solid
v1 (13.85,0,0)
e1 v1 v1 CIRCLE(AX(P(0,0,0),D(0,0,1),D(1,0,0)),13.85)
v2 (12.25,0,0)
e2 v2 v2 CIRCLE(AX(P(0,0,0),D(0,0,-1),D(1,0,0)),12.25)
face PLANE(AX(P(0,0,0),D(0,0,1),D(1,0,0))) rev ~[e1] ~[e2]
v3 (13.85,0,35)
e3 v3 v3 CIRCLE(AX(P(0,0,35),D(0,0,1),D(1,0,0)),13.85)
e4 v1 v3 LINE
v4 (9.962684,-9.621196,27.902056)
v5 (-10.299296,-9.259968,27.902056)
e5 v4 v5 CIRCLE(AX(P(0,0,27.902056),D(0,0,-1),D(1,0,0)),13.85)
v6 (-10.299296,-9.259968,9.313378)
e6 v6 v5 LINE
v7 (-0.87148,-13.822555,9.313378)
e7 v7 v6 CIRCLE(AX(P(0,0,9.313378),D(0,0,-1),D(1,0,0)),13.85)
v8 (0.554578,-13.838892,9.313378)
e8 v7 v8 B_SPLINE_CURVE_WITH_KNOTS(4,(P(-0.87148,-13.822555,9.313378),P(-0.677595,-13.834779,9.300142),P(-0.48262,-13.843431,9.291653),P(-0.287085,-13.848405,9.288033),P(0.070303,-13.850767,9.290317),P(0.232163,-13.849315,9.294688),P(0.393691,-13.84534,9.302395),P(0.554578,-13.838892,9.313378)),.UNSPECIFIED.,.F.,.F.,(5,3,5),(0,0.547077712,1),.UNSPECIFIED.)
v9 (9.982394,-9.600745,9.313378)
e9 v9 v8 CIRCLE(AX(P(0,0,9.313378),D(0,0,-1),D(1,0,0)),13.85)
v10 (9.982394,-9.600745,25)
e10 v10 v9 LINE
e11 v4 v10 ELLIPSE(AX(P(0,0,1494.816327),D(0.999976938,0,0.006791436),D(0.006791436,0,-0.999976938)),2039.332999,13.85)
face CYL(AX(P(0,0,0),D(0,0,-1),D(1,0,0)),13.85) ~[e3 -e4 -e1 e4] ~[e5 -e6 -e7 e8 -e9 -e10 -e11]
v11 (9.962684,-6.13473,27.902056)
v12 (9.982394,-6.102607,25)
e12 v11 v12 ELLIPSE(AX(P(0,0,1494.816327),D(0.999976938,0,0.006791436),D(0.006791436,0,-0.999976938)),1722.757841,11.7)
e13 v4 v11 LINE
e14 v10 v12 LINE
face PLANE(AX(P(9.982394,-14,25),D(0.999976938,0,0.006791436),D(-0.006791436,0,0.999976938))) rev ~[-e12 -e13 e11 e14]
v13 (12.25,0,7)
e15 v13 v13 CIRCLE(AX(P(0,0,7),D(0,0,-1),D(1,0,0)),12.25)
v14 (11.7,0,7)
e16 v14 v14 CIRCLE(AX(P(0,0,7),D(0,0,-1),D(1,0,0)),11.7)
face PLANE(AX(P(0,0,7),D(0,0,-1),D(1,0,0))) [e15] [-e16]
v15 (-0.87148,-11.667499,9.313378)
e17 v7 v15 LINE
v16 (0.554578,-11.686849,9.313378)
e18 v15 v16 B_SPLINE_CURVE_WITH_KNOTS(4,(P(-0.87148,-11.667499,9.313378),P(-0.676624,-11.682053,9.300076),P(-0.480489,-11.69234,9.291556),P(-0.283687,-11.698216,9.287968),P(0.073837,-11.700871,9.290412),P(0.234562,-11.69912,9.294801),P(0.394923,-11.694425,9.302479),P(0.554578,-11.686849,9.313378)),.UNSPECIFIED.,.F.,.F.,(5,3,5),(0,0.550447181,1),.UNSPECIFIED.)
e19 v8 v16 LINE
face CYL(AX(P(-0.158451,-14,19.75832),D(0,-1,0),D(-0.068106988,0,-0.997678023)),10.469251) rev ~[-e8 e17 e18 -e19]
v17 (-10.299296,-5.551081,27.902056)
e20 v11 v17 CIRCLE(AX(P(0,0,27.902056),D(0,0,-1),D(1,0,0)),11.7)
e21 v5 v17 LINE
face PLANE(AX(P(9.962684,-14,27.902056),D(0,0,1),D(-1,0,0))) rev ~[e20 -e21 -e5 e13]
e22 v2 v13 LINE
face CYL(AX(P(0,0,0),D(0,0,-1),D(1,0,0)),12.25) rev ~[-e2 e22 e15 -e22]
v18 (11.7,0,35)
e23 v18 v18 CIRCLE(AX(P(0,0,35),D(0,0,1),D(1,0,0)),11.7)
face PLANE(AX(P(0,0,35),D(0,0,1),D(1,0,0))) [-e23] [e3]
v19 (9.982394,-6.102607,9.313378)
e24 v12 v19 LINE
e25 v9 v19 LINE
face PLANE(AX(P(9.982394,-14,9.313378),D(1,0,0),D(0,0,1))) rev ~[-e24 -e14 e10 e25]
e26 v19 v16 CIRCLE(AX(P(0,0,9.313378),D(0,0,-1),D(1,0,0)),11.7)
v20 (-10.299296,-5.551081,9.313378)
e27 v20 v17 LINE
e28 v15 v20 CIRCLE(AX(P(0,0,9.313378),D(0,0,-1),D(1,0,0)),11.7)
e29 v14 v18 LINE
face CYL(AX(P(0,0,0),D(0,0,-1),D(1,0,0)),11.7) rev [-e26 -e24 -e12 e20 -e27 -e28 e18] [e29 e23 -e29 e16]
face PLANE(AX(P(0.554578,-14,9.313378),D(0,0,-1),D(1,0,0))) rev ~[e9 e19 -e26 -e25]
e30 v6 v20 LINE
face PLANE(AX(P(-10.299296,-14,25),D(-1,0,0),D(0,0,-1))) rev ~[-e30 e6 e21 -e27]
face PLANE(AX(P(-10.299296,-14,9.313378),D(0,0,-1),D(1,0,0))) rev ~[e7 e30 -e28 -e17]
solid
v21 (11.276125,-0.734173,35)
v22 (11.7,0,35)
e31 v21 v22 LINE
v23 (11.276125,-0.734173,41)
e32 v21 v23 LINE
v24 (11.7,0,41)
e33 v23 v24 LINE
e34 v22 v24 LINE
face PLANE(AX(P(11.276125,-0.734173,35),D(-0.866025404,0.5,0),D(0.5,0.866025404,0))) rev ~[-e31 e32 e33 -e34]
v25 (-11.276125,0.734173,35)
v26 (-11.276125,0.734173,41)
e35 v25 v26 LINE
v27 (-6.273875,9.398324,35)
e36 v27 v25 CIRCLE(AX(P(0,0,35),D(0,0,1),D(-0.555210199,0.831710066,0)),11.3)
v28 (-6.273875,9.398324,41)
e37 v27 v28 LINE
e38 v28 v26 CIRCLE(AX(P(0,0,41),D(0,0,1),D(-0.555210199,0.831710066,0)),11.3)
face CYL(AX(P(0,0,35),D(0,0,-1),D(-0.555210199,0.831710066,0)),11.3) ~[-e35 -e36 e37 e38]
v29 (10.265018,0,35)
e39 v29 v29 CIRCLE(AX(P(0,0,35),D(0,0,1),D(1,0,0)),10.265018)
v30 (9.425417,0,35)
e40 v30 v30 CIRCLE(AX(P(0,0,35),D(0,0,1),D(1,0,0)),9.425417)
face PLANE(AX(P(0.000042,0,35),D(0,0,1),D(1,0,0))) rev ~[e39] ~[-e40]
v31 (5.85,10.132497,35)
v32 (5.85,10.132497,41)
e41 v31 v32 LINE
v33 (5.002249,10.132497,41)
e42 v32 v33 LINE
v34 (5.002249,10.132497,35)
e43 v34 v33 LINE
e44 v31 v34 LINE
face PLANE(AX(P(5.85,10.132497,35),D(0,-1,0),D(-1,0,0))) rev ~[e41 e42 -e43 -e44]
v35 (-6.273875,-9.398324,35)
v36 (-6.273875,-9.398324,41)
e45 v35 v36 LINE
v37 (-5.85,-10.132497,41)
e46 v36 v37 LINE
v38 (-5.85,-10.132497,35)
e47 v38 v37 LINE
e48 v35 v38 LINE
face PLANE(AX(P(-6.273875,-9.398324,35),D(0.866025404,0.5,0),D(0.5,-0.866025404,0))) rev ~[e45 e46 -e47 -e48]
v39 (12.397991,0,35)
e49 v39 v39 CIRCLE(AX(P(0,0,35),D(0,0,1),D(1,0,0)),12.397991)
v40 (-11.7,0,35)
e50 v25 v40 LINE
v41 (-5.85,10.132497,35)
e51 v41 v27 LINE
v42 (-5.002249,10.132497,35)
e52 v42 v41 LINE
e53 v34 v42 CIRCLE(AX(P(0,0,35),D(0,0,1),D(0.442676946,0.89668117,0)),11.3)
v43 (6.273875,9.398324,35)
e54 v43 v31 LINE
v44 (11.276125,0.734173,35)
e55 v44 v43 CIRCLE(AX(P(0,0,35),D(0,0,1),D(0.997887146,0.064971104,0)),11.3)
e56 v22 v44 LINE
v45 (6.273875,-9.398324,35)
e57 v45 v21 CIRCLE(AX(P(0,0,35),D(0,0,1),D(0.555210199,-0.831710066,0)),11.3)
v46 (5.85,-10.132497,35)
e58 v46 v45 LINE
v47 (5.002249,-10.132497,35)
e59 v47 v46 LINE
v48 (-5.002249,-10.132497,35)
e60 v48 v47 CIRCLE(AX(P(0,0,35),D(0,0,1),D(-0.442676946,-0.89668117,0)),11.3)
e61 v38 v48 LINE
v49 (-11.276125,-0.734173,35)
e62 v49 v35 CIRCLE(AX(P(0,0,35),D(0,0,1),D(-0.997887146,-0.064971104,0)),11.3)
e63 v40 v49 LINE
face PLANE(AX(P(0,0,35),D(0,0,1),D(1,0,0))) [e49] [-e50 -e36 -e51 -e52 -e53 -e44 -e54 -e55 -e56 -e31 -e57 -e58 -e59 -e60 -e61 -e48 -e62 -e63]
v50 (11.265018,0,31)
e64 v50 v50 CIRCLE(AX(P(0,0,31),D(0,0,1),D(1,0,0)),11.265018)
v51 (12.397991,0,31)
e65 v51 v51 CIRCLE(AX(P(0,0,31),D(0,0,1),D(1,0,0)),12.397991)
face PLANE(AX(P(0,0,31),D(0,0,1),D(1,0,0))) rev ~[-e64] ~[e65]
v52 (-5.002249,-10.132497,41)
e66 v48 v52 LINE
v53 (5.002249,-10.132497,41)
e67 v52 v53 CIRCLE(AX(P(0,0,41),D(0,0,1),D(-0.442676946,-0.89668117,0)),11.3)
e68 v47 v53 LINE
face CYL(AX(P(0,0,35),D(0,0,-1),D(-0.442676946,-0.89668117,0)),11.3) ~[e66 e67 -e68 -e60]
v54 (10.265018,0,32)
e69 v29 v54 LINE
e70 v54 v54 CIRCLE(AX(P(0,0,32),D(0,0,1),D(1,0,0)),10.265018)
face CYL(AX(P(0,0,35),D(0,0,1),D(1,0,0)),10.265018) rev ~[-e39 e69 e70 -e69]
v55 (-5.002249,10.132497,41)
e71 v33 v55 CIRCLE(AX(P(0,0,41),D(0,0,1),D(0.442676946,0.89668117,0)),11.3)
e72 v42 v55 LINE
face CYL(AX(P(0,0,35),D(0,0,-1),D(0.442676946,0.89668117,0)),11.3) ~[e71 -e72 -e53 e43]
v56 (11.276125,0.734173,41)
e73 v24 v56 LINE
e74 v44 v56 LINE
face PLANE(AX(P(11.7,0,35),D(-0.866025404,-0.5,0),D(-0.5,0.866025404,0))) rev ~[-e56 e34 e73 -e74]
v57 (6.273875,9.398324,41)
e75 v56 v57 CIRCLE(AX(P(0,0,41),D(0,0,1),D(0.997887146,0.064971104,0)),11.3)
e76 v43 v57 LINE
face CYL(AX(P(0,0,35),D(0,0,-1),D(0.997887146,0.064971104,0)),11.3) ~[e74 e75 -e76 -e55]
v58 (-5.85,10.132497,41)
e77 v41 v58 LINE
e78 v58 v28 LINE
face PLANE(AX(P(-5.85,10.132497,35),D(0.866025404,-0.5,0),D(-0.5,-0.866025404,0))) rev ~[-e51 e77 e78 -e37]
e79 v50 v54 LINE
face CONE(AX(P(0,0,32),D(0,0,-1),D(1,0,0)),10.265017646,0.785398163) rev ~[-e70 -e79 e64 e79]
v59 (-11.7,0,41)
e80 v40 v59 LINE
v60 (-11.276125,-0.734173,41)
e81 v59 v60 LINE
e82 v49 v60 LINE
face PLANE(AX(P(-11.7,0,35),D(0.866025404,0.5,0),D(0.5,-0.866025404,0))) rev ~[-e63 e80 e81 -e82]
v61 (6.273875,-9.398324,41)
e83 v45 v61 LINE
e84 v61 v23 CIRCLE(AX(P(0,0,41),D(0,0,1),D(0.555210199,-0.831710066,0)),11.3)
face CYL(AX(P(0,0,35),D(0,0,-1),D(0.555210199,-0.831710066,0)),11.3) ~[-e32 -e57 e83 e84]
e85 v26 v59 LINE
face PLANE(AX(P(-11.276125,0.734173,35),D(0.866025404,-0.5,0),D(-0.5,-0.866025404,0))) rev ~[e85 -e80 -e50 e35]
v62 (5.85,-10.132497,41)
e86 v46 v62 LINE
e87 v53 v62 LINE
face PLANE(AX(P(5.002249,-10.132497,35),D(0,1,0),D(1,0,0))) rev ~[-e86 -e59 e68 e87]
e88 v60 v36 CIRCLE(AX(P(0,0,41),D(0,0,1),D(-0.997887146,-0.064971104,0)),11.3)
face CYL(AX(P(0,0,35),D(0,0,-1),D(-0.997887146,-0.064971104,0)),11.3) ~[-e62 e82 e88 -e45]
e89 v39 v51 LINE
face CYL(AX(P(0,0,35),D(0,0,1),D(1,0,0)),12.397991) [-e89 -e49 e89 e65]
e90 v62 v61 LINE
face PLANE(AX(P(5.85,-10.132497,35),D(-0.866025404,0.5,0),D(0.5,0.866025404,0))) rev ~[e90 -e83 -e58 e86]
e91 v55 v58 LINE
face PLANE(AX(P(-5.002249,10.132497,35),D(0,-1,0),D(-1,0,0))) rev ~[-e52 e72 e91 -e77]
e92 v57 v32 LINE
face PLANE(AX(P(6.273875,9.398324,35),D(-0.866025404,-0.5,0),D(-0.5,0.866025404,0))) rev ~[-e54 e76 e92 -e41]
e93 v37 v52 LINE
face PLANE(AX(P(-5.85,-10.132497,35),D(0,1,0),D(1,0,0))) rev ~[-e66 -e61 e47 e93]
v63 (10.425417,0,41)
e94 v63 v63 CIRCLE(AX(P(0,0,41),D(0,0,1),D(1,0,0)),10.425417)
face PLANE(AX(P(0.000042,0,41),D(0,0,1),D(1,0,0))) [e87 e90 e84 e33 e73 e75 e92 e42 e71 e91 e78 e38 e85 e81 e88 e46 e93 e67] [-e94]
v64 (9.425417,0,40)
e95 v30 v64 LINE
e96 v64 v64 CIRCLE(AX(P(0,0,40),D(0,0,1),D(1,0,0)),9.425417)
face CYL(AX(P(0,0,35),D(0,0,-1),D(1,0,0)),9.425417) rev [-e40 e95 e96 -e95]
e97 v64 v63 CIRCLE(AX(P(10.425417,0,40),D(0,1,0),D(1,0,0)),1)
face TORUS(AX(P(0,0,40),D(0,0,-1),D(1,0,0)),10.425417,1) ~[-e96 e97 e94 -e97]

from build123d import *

# Parameters (mm, degrees)
F0_R      = 13.85
F0_R_2    = 11.7
F1_DEPTH  = 35
F2_R      = 9.4254173389
F3_DEPTH  = 6
F4_R      = 12.3979909048
F4_R_2    = 10.2650176462
F5_DEPTH  = 4
F6_SIZE   = 1
F7_R      = 1
F8_R      = 12.25
F9_DEPTH  = 7
F12_DEPTH = 13
F14_DEPTH = 10


with BuildPart() as f1:
    # F0 (on Top) → F1 (new body)
    with BuildSketch(Plane.XY):
        Circle(F0_R)
        Circle(F0_R_2, mode=Mode.SUBTRACT)
    extrude(amount=F1_DEPTH)

    # F8 (on face) → F9 (cut)
    with BuildSketch(Plane(origin=(0, 0, 0), x_dir=(1, 0, 0), z_dir=(0, 0, -1))):
        Circle(F8_R)
    extrude(amount=-F9_DEPTH, mode=Mode.SUBTRACT)

    # F11 (on offset) → F12 (cut)
    with BuildSketch(Plane.XZ.offset(14)):
        Polygon((9.9823940545, 25), (-10.2992961183, 25), (-10.2992961183, 17.1566890553), (-10.2992961183, 9.3133781105), (-0.8714802098, 9.3133781105), (0.554578146, 9.3133781105), (9.9823940545, 9.3133781105), (9.9823940545, 17.1566890553), align=None)
        with BuildLine():
            Line((0.554578146, 9.3133781105), (-0.8714802098, 9.3133781105))
            ThreePointArc((-0.8714802098, 9.3133781105), (-0.1584510319, 9.2890687527), (0.554578146, 9.3133781105))
        make_face()
    extrude(amount=-F12_DEPTH, mode=Mode.SUBTRACT)

    # F13 (on offset) → F14 (cut)
    with BuildSketch(Plane.XZ.offset(14)):
        Polygon((-10.2992961183, 27.9020555317), (-10.2992961183, 25), (9.9823940545, 25), (9.9626844749, 27.9020555317), align=None)
    extrude(amount=-F14_DEPTH, mode=Mode.SUBTRACT)


with BuildPart() as f3:
    # F2 (on face) → F3 (new body)
    with BuildSketch(Plane.XY.offset(35)):
        with BuildLine():
            ThreePointArc((11.276124747, -0.7341734743), (11.2940296095, -0.3672807911), (11.3, 0))
            ThreePointArc((11.3, 0), (11.2940296095, 0.3672807911), (11.276124747, 0.7341734743))
            Line((11.276124747, 0.7341734743), (6.273875253, 9.39832375))
            ThreePointArc((6.273875253, 9.39832375), (5.65, 9.7860870628), (5.002249494, 10.1324972243))
            Line((5.002249494, 10.1324972243), (-5.002249494, 10.1324972243))
            ThreePointArc((-5.002249494, 10.1324972243), (-5.65, 9.7860870628), (-6.273875253, 9.39832375))
            Line((-6.273875253, 9.39832375), (-11.276124747, 0.7341734743))
            ThreePointArc((-11.276124747, 0.7341734743), (-11.3, 0), (-11.276124747, -0.7341734743))
            Line((-11.276124747, -0.7341734743), (-6.273875253, -9.39832375))
            ThreePointArc((-6.273875253, -9.39832375), (-5.65, -9.7860870628), (-5.002249494, -10.1324972243))
            Line((-5.002249494, -10.1324972243), (5.002249494, -10.1324972243))
            ThreePointArc((5.002249494, -10.1324972243), (5.65, -9.7860870628), (6.273875253, -9.39832375))
            Line((6.273875253, -9.39832375), (11.276124747, -0.7341734743))
        make_face()
        Circle(F2_R, mode=Mode.SUBTRACT)
        with BuildLine():
            ThreePointArc((11.276124747, 0.7341734743), (11.2940296095, 0.3672807911), (11.3, 0))
            ThreePointArc((11.3, 0), (11.2940296095, -0.3672807911), (11.276124747, -0.7341734743))
            Line((11.276124747, -0.7341734743), (11.7, 0))
            Line((11.7, 0), (11.276124747, 0.7341734743))
        make_face()
        with BuildLine():
            Line((6.273875253, 9.39832375), (11.276124747, 0.7341734743))
            ThreePointArc((11.276124747, 0.7341734743), (9.7860870628, 5.65), (6.273875253, 9.39832375))
        make_face()
        with BuildLine():
            ThreePointArc((6.273875253, -9.39832375), (9.7860870628, -5.65), (11.276124747, -0.7341734743))
            Line((11.276124747, -0.7341734743), (6.273875253, -9.39832375))
        make_face()
        with BuildLine():
            ThreePointArc((5.002249494, 10.1324972243), (5.65, 9.7860870628), (6.273875253, 9.39832375))
            Line((6.273875253, 9.39832375), (5.85, 10.1324972243))
            Line((5.85, 10.1324972243), (5.002249494, 10.1324972243))
        make_face()
        with BuildLine():
            Line((5.85, -10.1324972243), (6.273875253, -9.39832375))
            ThreePointArc((6.273875253, -9.39832375), (5.65, -9.7860870628), (5.002249494, -10.1324972243))
            Line((5.002249494, -10.1324972243), (5.85, -10.1324972243))
        make_face()
        with BuildLine():
            Line((-5.002249494, 10.1324972243), (5.002249494, 10.1324972243))
            ThreePointArc((5.002249494, 10.1324972243), (0, 11.3), (-5.002249494, 10.1324972243))
        make_face()
        with BuildLine():
            ThreePointArc((-5.002249494, -10.1324972243), (0, -11.3), (5.002249494, -10.1324972243))
            Line((5.002249494, -10.1324972243), (-5.002249494, -10.1324972243))
        make_face()
        with BuildLine():
            ThreePointArc((-6.273875253, 9.39832375), (-5.65, 9.7860870628), (-5.002249494, 10.1324972243))
            Line((-5.002249494, 10.1324972243), (-5.85, 10.1324972243))
            Line((-5.85, 10.1324972243), (-6.273875253, 9.39832375))
        make_face()
        with BuildLine():
            Line((-5.85, -10.1324972243), (-5.002249494, -10.1324972243))
            ThreePointArc((-5.002249494, -10.1324972243), (-5.65, -9.7860870628), (-6.273875253, -9.39832375))
            Line((-6.273875253, -9.39832375), (-5.85, -10.1324972243))
        make_face()
        with BuildLine():
            Line((-11.276124747, 0.7341734743), (-6.273875253, 9.39832375))
            ThreePointArc((-6.273875253, 9.39832375), (-9.7860870628, 5.65), (-11.276124747, 0.7341734743))
        make_face()
        with BuildLine():
            ThreePointArc((-11.276124747, -0.7341734743), (-9.7860870628, -5.65), (-6.273875253, -9.39832375))
            Line((-6.273875253, -9.39832375), (-11.276124747, -0.7341734743))
        make_face()
        with BuildLine():
            ThreePointArc((-11.276124747, -0.7341734743), (-11.3, 0), (-11.276124747, 0.7341734743))
            Line((-11.276124747, 0.7341734743), (-11.7, 0))
            Line((-11.7, 0), (-11.276124747, -0.7341734743))
        make_face()
    extrude(amount=F3_DEPTH)

    # F4 (on face) → F5 (join)
    with BuildSketch(Plane.XY.offset(35)):
        Circle(F4_R)
        Circle(F4_R_2, mode=Mode.SUBTRACT)
    extrude(amount=-F5_DEPTH)

    # F6
    f6_edges = [f3.edges().sort_by_distance(p)[0] for p in [
        (-10.265018, 0, 31),
    ]]
    chamfer(f6_edges, length=F6_SIZE)

    # F7
    f7_edges = [f3.edges().sort_by_distance(p)[0] for p in [
        (-9.425417, 0, 41),
    ]]
    fillet(f7_edges, radius=F7_R)


solid = Compound([f1.part, f3.part])
